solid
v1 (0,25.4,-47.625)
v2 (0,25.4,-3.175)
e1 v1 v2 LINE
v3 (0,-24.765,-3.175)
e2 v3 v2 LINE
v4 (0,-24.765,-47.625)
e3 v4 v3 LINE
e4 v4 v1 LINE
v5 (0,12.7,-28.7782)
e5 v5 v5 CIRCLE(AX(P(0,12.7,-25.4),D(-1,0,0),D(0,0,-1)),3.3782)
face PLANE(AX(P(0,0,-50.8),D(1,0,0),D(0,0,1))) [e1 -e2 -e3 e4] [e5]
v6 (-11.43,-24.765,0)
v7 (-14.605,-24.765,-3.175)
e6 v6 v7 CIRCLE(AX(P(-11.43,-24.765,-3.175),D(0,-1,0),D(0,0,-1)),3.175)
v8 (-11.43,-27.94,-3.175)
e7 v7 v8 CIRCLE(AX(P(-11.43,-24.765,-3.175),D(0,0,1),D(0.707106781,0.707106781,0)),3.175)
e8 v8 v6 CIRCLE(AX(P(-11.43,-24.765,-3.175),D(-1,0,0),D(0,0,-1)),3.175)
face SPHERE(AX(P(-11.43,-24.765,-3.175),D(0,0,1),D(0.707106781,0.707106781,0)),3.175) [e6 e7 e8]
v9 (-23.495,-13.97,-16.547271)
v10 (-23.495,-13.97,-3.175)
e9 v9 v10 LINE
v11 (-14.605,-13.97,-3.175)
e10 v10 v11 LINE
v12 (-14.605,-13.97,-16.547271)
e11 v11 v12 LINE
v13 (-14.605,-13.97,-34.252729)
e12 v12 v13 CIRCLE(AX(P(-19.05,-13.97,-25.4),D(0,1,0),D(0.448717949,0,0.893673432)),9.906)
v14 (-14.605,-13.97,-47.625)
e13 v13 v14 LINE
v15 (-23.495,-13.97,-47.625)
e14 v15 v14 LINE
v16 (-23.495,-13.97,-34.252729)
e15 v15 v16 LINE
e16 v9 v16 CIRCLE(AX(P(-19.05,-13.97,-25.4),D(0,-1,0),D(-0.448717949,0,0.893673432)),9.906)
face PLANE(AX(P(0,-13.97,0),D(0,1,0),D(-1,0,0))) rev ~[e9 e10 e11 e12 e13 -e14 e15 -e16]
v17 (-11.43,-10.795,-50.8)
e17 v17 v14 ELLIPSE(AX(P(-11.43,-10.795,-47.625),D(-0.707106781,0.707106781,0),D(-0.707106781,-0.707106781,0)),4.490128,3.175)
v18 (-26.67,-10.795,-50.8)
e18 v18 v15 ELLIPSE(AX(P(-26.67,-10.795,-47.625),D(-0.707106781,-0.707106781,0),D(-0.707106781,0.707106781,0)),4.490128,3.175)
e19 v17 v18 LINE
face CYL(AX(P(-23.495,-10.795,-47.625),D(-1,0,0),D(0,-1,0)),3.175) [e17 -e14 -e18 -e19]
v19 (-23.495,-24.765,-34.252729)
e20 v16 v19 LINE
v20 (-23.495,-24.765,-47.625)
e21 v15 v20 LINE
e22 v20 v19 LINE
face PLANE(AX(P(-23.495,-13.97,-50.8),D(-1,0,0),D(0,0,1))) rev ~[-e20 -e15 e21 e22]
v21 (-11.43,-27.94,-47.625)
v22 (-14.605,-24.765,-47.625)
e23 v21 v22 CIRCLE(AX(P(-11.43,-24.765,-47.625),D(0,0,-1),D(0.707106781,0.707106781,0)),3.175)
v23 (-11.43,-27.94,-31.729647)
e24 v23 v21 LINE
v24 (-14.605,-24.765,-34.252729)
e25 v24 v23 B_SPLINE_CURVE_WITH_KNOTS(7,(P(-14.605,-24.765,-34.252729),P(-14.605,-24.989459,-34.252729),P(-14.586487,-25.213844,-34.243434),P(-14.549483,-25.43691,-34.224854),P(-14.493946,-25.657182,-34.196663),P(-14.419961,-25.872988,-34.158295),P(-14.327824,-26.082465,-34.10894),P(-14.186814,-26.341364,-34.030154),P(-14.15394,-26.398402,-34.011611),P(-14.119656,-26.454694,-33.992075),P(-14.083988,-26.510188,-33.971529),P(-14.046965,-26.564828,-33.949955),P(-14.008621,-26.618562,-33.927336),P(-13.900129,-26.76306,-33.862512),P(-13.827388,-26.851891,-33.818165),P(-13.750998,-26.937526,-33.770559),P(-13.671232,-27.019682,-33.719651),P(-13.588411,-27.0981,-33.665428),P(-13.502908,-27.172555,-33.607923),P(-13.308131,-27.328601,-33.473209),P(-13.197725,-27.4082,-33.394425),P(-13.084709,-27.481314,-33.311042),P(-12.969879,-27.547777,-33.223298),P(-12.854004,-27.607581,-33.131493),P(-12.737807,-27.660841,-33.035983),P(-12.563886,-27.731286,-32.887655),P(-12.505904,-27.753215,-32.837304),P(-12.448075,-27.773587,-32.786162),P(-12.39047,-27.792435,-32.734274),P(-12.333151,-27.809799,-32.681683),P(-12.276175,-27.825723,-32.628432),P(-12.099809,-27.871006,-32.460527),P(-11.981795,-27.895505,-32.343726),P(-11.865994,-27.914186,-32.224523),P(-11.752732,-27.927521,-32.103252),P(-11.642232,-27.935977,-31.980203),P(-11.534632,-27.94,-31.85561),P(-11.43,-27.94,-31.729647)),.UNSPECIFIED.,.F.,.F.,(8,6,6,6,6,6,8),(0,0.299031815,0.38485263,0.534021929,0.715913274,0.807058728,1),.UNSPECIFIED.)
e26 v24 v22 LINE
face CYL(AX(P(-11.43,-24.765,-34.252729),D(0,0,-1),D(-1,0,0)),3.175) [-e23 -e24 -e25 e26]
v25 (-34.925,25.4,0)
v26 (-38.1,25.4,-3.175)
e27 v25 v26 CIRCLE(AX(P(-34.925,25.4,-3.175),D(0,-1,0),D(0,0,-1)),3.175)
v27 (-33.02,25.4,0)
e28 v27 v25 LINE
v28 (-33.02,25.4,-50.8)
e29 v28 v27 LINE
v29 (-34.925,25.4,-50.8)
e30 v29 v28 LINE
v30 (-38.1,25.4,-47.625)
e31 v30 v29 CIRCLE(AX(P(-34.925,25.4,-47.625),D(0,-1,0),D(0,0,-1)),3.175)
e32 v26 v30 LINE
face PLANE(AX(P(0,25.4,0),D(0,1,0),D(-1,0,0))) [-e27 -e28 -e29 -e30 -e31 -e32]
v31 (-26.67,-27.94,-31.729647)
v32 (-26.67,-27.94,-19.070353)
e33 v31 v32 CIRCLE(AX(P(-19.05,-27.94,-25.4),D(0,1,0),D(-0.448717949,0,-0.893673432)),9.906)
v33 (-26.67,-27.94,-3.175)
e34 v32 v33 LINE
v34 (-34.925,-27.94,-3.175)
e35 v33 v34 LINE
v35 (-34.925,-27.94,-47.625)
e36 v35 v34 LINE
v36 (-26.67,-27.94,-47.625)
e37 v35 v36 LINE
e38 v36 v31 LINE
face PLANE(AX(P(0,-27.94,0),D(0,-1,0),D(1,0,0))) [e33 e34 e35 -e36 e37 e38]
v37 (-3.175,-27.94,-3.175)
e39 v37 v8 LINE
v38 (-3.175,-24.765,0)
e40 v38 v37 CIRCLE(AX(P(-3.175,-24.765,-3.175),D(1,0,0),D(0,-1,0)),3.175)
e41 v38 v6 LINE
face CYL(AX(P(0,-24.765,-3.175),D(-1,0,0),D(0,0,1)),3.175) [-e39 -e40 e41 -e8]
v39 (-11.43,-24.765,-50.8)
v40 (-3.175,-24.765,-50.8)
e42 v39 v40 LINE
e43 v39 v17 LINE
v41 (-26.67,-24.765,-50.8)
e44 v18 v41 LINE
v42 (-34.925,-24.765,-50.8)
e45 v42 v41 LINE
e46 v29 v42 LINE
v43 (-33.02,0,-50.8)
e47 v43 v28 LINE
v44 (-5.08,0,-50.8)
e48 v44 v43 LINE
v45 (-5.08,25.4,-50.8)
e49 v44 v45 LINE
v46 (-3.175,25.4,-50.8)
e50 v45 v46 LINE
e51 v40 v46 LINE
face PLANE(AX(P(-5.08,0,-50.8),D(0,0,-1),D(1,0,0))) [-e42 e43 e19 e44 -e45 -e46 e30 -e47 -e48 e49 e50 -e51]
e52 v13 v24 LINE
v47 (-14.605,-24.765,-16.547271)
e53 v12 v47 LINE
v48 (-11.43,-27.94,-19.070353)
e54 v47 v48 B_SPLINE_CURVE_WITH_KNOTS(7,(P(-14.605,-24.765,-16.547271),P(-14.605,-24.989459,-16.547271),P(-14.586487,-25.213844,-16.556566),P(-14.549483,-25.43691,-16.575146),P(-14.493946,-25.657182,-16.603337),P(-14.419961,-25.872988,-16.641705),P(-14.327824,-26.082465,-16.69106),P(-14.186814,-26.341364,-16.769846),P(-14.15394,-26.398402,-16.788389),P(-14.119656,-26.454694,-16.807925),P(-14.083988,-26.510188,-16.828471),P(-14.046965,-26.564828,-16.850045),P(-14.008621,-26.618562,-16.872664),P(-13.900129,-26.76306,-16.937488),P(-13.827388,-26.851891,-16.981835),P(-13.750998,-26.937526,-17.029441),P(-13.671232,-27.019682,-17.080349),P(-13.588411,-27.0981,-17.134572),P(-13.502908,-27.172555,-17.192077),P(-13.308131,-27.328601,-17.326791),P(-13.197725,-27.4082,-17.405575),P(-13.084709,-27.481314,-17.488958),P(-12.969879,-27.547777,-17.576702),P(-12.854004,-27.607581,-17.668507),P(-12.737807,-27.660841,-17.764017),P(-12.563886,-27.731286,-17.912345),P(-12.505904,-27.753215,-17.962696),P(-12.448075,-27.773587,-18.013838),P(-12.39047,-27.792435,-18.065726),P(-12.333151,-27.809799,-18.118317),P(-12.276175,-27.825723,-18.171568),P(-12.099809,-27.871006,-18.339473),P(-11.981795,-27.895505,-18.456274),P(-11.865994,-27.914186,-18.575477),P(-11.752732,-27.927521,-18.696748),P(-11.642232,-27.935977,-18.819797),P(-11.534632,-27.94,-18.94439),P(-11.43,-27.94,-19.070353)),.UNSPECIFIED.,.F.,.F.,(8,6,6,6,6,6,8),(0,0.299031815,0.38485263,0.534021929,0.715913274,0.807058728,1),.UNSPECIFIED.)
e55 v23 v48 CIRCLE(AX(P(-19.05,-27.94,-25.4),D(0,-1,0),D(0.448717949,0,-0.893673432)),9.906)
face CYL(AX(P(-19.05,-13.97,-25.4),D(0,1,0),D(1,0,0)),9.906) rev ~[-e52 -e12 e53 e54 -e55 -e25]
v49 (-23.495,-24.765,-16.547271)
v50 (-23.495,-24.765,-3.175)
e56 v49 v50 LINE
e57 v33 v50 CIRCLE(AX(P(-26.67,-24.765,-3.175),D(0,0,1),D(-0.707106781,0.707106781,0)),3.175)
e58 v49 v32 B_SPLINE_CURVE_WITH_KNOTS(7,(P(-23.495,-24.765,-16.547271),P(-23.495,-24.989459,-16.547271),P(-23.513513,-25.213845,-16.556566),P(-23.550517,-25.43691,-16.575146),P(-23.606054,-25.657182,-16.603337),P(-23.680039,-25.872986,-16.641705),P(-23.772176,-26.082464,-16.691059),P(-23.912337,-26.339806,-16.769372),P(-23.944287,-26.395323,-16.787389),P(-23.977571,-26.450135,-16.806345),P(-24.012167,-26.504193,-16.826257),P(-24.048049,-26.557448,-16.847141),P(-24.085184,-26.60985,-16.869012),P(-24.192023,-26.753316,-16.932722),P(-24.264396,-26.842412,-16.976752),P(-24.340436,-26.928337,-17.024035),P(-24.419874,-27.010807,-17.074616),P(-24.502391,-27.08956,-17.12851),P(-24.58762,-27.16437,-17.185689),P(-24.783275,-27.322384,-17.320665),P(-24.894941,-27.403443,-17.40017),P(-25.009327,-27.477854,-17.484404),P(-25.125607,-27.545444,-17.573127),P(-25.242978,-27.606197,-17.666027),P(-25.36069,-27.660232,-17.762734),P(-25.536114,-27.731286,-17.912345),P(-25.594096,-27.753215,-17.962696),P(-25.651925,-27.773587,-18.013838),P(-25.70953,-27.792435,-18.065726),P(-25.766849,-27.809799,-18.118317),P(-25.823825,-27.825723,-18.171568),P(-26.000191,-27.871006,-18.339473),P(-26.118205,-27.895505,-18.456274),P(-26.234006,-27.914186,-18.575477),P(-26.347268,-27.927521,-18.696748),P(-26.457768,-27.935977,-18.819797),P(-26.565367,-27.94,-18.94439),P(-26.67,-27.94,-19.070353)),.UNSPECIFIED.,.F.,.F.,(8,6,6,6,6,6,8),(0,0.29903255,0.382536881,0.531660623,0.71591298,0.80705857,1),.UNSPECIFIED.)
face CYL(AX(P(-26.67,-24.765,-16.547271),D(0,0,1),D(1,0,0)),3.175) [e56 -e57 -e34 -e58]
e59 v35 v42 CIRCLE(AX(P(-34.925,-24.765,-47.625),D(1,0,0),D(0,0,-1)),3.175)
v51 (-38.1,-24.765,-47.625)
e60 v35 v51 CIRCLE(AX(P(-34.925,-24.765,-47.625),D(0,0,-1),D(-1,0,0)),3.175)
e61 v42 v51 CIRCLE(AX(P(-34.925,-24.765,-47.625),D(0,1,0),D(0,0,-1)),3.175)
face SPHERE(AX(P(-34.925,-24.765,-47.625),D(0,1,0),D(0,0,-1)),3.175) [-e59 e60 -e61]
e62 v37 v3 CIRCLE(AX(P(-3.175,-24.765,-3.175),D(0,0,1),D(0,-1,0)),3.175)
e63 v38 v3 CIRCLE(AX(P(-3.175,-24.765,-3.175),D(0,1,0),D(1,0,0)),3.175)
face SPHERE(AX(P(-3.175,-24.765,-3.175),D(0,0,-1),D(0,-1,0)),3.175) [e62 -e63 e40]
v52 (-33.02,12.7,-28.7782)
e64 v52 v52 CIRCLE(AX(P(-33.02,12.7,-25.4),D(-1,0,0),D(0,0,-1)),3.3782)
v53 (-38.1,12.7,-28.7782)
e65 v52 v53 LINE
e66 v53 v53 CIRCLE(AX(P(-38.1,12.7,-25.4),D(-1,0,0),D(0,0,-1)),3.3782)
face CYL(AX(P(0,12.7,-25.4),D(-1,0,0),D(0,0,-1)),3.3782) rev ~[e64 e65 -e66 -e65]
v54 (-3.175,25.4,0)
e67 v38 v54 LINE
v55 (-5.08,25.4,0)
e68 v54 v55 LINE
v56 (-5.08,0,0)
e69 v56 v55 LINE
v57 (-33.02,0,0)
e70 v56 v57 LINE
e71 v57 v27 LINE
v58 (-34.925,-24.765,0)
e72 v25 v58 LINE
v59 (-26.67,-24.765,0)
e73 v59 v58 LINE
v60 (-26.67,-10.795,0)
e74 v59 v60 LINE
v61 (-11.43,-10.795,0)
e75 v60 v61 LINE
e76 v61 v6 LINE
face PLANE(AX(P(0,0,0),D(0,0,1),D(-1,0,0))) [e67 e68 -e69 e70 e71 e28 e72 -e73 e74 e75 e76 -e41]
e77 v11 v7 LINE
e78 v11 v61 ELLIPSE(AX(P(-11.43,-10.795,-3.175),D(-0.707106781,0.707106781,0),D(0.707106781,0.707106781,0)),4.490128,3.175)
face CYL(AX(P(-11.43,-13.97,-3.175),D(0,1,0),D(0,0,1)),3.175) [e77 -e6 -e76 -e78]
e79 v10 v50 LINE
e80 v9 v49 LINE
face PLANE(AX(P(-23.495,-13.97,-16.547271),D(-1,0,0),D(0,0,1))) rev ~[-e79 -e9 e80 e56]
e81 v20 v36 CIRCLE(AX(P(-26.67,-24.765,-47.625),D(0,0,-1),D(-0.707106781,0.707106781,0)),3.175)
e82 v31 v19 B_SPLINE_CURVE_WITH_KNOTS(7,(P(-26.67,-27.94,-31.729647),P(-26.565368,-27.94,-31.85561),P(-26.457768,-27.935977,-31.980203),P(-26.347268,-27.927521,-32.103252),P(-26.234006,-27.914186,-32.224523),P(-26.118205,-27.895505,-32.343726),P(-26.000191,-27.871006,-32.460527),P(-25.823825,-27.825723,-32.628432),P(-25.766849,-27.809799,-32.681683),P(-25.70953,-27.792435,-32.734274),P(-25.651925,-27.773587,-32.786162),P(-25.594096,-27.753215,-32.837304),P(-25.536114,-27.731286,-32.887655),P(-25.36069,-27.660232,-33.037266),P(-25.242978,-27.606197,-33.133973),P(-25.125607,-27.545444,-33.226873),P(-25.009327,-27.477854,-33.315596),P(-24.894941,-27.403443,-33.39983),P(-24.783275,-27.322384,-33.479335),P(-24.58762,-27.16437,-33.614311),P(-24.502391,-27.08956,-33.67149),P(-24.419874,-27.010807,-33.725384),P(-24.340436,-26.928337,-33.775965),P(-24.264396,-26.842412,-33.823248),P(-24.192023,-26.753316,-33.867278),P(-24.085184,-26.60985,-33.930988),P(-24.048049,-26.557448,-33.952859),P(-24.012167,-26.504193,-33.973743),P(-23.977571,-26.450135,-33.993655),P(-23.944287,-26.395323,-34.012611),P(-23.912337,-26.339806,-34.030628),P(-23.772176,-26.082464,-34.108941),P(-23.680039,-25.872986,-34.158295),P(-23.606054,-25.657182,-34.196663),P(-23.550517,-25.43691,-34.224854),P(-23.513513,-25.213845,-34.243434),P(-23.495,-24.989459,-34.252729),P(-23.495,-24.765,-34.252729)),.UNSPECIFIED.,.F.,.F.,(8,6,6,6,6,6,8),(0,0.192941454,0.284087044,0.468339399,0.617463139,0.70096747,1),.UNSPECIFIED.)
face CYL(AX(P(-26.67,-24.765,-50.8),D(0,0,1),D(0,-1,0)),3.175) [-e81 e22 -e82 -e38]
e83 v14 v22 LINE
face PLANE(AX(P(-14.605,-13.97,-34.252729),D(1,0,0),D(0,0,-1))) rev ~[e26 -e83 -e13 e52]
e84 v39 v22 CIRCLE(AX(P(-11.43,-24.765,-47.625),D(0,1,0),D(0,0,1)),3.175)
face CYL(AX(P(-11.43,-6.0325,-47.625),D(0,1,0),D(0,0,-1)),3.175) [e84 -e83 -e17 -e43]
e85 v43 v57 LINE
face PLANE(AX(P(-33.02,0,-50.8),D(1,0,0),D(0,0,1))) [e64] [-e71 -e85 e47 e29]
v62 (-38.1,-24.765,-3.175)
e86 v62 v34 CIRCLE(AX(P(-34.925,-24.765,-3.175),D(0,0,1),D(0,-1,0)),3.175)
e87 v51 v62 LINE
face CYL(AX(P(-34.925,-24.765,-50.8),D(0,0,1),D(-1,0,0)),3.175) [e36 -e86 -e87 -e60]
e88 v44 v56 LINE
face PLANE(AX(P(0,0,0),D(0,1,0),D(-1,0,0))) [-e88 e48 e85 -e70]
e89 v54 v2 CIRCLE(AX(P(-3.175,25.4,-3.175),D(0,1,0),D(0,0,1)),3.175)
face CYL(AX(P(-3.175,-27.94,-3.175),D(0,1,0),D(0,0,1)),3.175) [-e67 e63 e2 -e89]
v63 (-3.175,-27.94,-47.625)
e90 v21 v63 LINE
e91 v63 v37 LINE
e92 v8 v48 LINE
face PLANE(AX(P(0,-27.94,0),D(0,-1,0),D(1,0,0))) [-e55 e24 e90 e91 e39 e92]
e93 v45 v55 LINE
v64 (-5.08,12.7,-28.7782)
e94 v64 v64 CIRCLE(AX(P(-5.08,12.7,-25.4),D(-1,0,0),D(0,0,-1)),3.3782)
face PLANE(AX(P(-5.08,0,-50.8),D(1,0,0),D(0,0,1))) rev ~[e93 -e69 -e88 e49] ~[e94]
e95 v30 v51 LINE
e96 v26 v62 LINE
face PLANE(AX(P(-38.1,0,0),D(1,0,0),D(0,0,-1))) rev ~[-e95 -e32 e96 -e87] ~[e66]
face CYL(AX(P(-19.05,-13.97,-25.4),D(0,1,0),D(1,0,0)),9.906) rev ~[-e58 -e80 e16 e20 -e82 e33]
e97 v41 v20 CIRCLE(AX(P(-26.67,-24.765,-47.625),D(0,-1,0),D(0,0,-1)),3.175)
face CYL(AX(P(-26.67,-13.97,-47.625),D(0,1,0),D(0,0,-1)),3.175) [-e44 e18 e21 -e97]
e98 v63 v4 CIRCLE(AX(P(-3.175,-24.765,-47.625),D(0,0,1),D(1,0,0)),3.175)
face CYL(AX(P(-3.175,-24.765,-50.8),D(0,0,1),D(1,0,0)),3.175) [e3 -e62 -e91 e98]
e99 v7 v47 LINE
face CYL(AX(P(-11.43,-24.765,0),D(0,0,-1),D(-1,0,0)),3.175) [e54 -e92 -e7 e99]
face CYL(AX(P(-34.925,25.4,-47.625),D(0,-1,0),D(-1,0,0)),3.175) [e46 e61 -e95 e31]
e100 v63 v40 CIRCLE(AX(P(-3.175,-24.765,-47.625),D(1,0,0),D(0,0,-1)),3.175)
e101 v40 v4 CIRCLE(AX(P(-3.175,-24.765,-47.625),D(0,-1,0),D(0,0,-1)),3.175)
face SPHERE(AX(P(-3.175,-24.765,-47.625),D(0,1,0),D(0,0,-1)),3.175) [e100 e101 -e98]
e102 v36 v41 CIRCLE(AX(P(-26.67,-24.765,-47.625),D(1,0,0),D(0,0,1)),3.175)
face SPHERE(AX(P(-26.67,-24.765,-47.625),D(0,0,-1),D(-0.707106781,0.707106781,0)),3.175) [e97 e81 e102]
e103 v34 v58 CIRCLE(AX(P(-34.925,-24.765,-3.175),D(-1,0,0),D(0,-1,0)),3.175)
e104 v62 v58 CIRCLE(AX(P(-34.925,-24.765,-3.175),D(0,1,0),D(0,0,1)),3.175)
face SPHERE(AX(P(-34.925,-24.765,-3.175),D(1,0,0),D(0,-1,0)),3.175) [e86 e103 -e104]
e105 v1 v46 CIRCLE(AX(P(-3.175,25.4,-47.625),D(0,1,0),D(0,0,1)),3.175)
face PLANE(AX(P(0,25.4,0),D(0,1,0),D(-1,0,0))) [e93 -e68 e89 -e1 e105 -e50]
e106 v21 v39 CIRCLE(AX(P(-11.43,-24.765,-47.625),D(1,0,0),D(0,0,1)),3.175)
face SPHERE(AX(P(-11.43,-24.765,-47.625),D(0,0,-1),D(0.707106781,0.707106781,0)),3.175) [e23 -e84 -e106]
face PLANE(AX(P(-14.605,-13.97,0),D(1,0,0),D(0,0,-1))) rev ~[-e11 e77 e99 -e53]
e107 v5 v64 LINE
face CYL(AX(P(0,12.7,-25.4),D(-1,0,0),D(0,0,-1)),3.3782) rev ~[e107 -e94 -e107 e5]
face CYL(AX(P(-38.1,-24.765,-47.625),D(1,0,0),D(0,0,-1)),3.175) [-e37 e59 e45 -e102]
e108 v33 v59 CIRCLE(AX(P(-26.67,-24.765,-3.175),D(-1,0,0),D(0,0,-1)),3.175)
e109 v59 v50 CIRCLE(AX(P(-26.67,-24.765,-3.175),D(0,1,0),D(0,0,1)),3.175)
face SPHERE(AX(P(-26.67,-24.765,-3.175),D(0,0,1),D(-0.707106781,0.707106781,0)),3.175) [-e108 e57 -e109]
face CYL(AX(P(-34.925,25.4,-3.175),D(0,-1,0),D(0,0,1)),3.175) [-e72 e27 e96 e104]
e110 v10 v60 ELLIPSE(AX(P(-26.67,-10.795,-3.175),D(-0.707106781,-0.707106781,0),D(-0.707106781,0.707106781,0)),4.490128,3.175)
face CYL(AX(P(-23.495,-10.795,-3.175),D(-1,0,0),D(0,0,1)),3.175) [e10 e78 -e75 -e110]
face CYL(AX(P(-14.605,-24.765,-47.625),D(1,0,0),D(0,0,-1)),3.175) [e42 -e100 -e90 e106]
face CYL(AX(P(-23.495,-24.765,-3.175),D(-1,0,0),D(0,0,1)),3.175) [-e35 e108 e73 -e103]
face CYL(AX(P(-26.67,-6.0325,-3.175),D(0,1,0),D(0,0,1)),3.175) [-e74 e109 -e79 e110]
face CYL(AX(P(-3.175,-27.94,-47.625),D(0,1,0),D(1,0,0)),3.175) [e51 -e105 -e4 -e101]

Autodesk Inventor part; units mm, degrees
ref_plane "YZ Plane" through (0, 0, 0) normal (1, 0, 0) x (0, 1, 0)
ref_plane "XZ Plane" through (0, 0, 0) normal (0, 1, 0) x (-1, 0, 0)
ref_plane "XY Plane" through (0, 0, 0) normal (0, 0, 1) x (1, 0, 0)
sketch "Sketch1" plane through (0, 0, 0) normal (0, 1, 0) x (-1, 0, 0)
  line L0 (0, 0) -> (38.1, 0)
  line L1 (38.1, 0) -> (38.1, -50.8)
  line L2 (38.1, -50.8) -> (0, -50.8)
  line L3 (0, -50.8) -> (0, 0)
  line L4 (38.1, -50.8) -> (33.02, -50.8)
  line L5 (33.02, -50.8) -> (33.02, 0)
  line L6 (33.02, 0) -> (38.1, 0)
  line L7 (38.1, 0) -> (38.1, -50.8)
  line L8 (0, -50.8) -> (5.08, -50.8)
  line L9 (5.08, -50.8) -> (5.08, 0)
  line L10 (5.08, 0) -> (0, 0)
  line L11 (0, 0) -> (0, -50.8)
  dimension "d0" = 38.1
  dimension "d1" = 50.8
  dimension "d2" = 5.08
  dimension "d3" = 5.08
extrude "Extrusion1" add sketch "Sketch1" along normal blind 25.4 contours L0 L9 L2 L3 | L0 L1 L2 L5
extrude "Extrusion2" add sketch "Sketch1" against normal blind 13.97
sketch "Sketch2" plane through (0, 25.4, 0) normal (1, 0, 0) x (0, 0, -1)
  line L0 (50.8, 0) -> (0, 0) projected
  line L1 (25.4, 0) -> (25.4, -12.7)
  point P0 (0, -25.4)
  dimension "d8" = 12.7
hole "Hole1" at (0, 12.7, -25.4) direction (-1, 0, 0) diameter 6.7564 end through all clearance for "Socket Head Cap Screw" size "1/4" standard "Ansi Unified Screw Threads"
sketch "Sketch3" plane through (0, -13.97, 0) normal (0, -1, 0) x (1, 0, 0)
  line L0 (-38.1, -28.7782) -> (-38.1, -22.0218) projected
  line L1 (-38.1, -25.4) -> (-19.05, -25.4)
  line L2 (0, 0) -> (-38.1, 0) projected
  line L3 (-14.605, -50.8) -> (-23.495, -50.8)
  line L4 (-23.495, -50.8) -> (-23.495, 0)
  line L5 (-23.495, 0) -> (-14.605, 0)
  line L6 (-14.605, 0) -> (-14.605, -50.8)
  line L7 (-14.605, -50.8) -> (-23.495, 0) construction
  line L8 (-23.495, -50.8) -> (-14.605, 0) construction
  circle A0 centre (-19.05, -25.4) radius 9.906
  line L9 (-38.1, -50.8) -> (0, -50.8)
  line L10 (0, -50.8) -> (0, 0)
  line L11 (0, 0) -> (-38.1, 0)
  line L12 (-38.1, 0) -> (-38.1, -50.8)
  line L13 (-38.1, -50.8) -> (0, 0) construction
  line L14 (0, -50.8) -> (-38.1, 0) construction
  point P0 (-14.605, -16.5473)
  point P1 (-14.605, -34.2527)
  point P2 (-23.495, -34.2527)
  point P3 (-23.495, -16.5473)
  dimension "d16" = 19.05
  dimension "d17" = 8.89
  dimension "d18" = 19.812
extrude "Extrusion3" add sketch "Sketch3" along normal blind 13.97 contours L0 L1 A0 L4 L9 L12 | L0 L12 L2 L4 A0 L1 | L6 A0 L2 L10 L9
fillet "Fillet1" radius 3.175 14 edges at (-38.1, -1.27, -50.8) (0, -1.27, -50.8) (-7.3025, -27.94, -50.8) (0, -27.94, -25.4) (-30.7975, -27.94, -50.8) (-7.3025, -27.94, 0) (-30.7975, -27.94, 0) (-38.1, -27.94, -25.4) (-38.1, -1.27, 0) (0, -1.27, 0) (-14.605, -27.94, -42.5264) (-14.605, -27.94, -8.2736) (-23.495, -27.94, -8.2736) (-23.495, -27.94, -42.5264)
fillet "Fillet2" radius 3.175 14 edges at (-19.05, -13.97, 0) (-19.05, -13.97, -50.8) (-24.4249, -27.0101, -0.9299) (-23.495, -19.3675, 0) (-13.6751, -27.0101, -0.9299) (-14.605, -19.3675, 0) (-13.6751, -27.0101, -49.8701) (-7.3025, -27.94, -47.625) (-3.175, -27.0101, -49.8701) (-14.605, -19.3675, -50.8) (-34.925, -27.0101, -49.8701) (-30.7975, -27.94, -47.625) (-24.4249, -27.0101, -49.8701) (-23.495, -19.3675, -50.8)
properties part number "Sample Holder end for 8020-valveholder"
